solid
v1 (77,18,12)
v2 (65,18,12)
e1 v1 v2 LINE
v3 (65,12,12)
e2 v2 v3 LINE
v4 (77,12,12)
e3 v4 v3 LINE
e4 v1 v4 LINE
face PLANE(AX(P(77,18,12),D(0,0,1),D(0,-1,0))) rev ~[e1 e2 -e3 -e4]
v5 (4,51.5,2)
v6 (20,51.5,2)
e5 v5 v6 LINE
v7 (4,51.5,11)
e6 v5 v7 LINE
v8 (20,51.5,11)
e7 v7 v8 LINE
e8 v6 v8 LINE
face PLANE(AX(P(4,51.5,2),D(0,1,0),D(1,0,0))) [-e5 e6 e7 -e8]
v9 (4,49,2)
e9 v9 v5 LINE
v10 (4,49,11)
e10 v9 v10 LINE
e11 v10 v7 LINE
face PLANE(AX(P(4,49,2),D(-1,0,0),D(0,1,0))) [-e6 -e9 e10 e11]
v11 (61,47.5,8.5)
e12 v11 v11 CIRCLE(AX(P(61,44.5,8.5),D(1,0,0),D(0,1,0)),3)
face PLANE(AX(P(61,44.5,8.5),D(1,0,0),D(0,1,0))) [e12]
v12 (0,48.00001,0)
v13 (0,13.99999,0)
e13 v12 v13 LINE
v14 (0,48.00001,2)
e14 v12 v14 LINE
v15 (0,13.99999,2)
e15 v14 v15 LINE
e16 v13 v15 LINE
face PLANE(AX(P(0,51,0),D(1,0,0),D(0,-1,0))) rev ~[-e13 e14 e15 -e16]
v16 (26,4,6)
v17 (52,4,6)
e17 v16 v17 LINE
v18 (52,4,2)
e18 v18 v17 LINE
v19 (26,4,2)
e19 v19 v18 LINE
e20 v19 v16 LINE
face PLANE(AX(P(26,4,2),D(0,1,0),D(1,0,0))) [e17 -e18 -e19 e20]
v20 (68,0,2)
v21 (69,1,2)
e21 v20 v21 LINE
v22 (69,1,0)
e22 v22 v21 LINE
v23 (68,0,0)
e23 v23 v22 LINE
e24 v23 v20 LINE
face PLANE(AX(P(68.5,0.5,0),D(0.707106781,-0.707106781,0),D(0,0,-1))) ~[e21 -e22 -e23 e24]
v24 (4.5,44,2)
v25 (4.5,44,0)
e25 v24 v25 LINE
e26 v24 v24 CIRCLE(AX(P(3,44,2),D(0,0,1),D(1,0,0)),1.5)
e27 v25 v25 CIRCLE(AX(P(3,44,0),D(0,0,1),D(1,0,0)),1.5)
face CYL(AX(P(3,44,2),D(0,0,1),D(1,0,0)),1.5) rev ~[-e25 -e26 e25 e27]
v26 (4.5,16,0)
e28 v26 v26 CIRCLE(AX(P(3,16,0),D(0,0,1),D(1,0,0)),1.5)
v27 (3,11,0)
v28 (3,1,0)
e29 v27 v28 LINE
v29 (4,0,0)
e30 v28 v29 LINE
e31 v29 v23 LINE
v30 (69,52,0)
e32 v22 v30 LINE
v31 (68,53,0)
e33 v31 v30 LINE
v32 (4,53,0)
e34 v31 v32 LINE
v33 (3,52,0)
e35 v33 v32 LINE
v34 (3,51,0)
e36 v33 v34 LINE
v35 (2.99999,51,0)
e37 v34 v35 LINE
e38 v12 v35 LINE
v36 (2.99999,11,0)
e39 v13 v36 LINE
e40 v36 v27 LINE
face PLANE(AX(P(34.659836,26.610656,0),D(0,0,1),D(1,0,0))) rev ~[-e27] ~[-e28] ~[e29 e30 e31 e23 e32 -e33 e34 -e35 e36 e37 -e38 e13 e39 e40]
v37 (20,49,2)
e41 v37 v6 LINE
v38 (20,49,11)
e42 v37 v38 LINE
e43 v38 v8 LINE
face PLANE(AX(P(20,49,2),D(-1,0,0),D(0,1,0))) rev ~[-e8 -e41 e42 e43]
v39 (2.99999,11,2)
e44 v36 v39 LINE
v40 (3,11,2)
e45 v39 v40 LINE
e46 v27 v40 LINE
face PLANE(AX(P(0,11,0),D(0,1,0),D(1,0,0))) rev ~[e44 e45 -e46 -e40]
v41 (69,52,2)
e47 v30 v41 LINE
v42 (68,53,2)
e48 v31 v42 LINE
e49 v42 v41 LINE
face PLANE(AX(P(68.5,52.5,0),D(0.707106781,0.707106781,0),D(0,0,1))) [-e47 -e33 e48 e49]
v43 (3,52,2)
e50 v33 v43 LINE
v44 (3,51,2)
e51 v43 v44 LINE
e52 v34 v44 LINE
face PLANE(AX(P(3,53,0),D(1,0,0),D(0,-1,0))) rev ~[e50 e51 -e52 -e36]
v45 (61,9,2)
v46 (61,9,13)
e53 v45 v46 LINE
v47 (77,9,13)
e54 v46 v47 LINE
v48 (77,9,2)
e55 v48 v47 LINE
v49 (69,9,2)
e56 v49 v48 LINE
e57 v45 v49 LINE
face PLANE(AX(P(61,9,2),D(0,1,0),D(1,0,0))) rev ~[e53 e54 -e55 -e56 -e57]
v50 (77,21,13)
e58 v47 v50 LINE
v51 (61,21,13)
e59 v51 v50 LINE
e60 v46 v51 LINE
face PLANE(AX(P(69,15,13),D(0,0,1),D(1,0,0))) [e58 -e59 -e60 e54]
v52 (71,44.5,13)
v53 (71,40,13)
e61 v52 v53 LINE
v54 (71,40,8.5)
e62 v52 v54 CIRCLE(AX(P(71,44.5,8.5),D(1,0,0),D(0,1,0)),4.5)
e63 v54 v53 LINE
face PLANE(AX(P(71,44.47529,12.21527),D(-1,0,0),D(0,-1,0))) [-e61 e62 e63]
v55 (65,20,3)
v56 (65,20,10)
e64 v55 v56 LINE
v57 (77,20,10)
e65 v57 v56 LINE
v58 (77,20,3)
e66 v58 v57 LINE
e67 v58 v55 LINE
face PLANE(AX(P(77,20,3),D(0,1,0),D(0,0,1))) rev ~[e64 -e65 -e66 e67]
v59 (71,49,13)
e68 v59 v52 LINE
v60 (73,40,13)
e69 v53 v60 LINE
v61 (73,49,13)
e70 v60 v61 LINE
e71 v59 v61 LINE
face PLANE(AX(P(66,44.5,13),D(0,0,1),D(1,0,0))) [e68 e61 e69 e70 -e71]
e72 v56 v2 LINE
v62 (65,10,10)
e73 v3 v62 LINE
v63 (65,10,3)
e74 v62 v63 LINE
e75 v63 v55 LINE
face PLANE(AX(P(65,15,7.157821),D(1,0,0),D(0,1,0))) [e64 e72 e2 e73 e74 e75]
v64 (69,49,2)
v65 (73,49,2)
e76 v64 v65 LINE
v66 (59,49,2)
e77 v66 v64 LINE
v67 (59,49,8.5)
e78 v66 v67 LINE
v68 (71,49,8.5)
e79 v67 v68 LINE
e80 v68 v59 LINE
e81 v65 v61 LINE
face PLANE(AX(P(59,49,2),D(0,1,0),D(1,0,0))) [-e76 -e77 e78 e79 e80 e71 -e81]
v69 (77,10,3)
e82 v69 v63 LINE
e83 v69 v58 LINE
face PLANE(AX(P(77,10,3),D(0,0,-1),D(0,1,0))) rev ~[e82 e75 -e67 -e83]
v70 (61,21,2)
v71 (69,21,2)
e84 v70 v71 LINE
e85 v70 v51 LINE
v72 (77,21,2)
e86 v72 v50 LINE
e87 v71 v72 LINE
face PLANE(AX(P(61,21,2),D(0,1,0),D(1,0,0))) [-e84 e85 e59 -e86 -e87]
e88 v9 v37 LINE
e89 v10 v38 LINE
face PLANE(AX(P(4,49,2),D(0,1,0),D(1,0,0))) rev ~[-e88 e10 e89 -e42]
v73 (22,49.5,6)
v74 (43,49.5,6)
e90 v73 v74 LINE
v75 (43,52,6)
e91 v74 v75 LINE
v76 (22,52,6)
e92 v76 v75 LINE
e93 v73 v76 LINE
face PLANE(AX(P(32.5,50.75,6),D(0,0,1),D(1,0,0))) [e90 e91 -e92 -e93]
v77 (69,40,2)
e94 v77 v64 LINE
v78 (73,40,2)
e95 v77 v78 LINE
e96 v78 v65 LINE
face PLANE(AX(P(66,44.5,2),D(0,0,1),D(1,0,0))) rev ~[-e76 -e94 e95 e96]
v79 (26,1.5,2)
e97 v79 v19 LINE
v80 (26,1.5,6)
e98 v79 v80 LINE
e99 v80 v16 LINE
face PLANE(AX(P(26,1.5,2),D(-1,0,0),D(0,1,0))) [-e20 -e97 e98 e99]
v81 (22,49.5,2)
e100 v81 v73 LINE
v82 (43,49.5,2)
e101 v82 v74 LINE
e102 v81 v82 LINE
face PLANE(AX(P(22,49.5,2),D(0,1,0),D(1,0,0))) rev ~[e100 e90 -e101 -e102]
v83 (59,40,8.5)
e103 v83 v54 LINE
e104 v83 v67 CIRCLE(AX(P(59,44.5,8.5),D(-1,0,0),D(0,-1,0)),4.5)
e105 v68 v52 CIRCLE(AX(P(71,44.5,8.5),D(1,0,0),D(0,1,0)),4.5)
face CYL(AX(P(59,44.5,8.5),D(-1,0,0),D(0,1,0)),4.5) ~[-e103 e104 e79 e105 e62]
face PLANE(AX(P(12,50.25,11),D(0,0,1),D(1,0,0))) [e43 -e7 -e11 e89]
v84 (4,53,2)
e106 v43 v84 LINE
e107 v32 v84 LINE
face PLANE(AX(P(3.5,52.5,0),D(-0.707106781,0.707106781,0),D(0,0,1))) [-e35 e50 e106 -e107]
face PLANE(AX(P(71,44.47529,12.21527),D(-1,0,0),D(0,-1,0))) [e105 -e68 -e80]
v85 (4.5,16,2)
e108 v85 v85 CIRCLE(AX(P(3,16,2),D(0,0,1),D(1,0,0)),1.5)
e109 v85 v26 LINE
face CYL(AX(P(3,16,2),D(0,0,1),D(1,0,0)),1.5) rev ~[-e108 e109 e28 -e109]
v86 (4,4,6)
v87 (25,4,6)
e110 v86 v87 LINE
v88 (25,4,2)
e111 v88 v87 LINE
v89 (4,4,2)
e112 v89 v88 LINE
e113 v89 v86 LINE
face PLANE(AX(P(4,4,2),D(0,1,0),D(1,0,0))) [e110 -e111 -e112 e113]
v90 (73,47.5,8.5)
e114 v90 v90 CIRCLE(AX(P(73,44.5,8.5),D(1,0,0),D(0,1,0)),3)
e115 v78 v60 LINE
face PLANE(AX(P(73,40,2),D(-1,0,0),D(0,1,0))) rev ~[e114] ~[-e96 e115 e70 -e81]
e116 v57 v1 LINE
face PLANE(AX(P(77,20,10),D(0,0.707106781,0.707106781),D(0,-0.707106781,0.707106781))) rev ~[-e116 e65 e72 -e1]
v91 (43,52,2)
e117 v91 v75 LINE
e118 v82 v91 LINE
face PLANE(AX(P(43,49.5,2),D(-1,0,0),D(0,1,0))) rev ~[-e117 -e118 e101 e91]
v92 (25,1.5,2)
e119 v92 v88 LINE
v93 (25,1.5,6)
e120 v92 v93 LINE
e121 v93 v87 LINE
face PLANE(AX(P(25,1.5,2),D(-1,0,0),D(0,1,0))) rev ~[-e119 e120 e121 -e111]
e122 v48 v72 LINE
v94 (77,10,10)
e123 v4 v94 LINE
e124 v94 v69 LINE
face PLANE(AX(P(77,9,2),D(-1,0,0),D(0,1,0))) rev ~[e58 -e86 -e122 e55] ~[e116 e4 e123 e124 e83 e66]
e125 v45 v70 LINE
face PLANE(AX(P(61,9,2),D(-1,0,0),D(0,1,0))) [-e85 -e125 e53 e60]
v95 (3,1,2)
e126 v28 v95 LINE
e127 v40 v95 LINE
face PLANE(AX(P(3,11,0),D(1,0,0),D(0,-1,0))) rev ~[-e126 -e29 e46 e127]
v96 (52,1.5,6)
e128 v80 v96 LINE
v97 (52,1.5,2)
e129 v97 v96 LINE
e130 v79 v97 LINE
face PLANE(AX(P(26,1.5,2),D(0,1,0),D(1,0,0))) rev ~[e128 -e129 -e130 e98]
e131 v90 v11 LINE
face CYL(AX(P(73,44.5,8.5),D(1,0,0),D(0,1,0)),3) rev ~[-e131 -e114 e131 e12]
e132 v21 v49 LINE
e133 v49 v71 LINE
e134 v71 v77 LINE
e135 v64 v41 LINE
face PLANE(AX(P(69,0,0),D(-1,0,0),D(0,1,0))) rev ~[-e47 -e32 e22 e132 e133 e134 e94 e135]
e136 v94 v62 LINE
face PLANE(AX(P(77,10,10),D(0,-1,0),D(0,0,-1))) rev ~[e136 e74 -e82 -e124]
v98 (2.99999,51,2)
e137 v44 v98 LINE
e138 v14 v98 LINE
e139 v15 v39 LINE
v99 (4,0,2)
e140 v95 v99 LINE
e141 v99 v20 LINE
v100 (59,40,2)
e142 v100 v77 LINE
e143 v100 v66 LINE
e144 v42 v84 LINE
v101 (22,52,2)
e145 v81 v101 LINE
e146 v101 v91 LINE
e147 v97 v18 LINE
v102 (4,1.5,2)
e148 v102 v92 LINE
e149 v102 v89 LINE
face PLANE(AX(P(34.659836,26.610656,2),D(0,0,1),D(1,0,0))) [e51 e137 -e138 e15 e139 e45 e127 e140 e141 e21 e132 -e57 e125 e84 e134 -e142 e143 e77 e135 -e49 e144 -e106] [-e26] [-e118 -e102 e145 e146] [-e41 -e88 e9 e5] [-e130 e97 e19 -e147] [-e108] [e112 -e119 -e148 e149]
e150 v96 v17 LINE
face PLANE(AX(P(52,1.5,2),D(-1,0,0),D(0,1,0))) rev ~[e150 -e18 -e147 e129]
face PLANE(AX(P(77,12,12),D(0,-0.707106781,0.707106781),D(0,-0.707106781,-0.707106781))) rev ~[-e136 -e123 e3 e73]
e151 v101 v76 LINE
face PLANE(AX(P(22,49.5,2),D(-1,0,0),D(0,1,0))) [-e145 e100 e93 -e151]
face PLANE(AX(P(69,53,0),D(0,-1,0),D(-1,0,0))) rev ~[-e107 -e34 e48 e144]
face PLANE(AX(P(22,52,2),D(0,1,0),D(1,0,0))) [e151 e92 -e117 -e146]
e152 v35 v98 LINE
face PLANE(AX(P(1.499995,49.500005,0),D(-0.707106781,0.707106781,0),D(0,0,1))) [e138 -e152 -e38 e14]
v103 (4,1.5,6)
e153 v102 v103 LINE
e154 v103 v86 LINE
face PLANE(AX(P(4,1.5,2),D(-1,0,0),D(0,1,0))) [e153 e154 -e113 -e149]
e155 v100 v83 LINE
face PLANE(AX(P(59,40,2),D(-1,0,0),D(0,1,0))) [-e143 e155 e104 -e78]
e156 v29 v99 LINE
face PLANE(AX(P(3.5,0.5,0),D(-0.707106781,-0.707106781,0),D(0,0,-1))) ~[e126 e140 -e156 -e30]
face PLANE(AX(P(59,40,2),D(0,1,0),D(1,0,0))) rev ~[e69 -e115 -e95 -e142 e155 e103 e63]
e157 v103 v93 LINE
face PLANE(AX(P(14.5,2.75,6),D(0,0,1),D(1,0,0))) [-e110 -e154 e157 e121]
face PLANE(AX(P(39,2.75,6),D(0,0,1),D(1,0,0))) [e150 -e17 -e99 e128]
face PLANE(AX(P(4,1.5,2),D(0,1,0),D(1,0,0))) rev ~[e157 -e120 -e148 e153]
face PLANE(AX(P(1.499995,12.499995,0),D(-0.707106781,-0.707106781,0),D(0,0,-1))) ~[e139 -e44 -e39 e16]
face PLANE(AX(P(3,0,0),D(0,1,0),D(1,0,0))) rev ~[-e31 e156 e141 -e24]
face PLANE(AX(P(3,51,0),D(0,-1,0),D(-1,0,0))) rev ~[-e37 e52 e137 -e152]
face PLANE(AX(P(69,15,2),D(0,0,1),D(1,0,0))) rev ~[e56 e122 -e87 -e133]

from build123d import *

# Parameters (mm, degrees)
F1_DEPTH  = 2
F2_W      = 16
F2_H      = 12
F3_DEPTH  = 11
F4_W      = 14
F4_H      = 9
F5_DEPTH  = 11
F6_W      = 16
F6_H      = 2.5
F7_DEPTH  = 9
F8_W      = 21
F8_H      = 2.5
F9_DEPTH  = 4
F10_W     = 21
F10_H     = 2.5
F10_W_2   = 26
F11_DEPTH = 4
F13_DEPTH = 12
F14_R     = 3
F15_DEPTH = 12
F17_DEPTH = 12
F18_SIZE2 = 2.99999
F18_SIZE  = 2.99999
F19_SIZE2 = 1
F19_SIZE  = 1
F20_R     = 1.5
F21_DEPTH = 2


# Not quite as in the source:
# - a fillet or chamfer is up to 0.001 mm smaller than in the source, because OpenCascade refuses the exact size


with BuildPart() as f1:
    # F0 (on Top) → F1 (new body)
    with BuildSketch(Plane.XY):
        Polygon((3, 11), (3, 0), (69, 0), (69, 53), (3, 53), (3, 51), (0, 51), (0, 11), align=None)
    extrude(amount=F1_DEPTH)

    # F2 (on face) → F3 (join)
    with BuildSketch(Plane.XY.offset(2)):
        with Locations((69, 15)):
            Rectangle(F2_W, F2_H)
    extrude(amount=F3_DEPTH)

    # F4 (on face) → F5 (join)
    with BuildSketch(Plane.XY.offset(2)):
        with Locations((66, 44.5)):
            Rectangle(F4_W, F4_H)
    extrude(amount=F5_DEPTH)

    # F6 (on face) → F7 (join)
    with BuildSketch(Plane.XY.offset(2)):
        with Locations((12, 50.25)):
            Rectangle(F6_W, F6_H)
    extrude(amount=F7_DEPTH)

    # F8 (on face) → F9 (join)
    with BuildSketch(Plane.XY.offset(2)):
        with Locations((32.5, 50.75)):
            Rectangle(F8_W, F8_H)
    extrude(amount=F9_DEPTH)

    # F10 (on face) → F11 (join)
    with BuildSketch(Plane.XY.offset(2)):
        with Locations((14.5, 2.75)):
            Rectangle(F10_W, F10_H)
        with Locations((39, 2.75)):
            Rectangle(F10_W_2, F10_H)
    extrude(amount=F11_DEPTH)

    # F12 (on face) → F13 (cut)
    with BuildSketch(Plane(origin=(59, 0, 0), x_dir=(0, -1, 0), z_dir=(-1, 0, 0))):
        with BuildLine():
            ThreePointArc((-49, 8.5), (-44.5, 13), (-40, 8.5))
            Line((-40, 8.5), (-38.6329554021, 9.580289945))
            Line((-38.6329554021, 9.580289945), (-38.187738508, 14.0570942312))
            Line((-38.187738508, 14.0570942312), (-42.2688946128, 14.7991068661))
            Line((-42.2688946128, 14.7991068661), (-51.2474328279, 13.8839585707))
            Line((-51.2474328279, 13.8839585707), (-49, 8.5))
        make_face()
        Polygon((-40, 13), (-40, 8.5), (-38.6329554021, 9.580289945), (-38.187738508, 14.0570942312), (-42.2688946128, 14.7991068661), (-51.2474328279, 13.8839585707), (-49, 8.5), (-49, 13), (-44.5, 13), align=None)
    extrude(amount=-F13_DEPTH, mode=Mode.SUBTRACT)

    # F14 (on face) → F15 (cut)
    with BuildSketch(Plane.YZ.offset(73)):
        with Locations((44.5, 8.5)):
            Circle(F14_R)
    extrude(amount=-F15_DEPTH, mode=Mode.SUBTRACT)

    # F16 (on face) → F17 (cut)
    with BuildSketch(Plane.YZ.offset(77)):
        Polygon((18, 12), (12, 12), (10, 10), (10, 3), (20, 3), (20, 10), align=None)
    extrude(amount=-F17_DEPTH, mode=Mode.SUBTRACT)

    # F18 (size 3 and 3 in the source; OpenCascade refuses exactly that, so slightly less here)
    f18_edges = [f1.edges().sort_by_distance(p)[0] for p in [
        (0, 51, 1),
        (0, 11, 1),
    ]]
    chamfer(f18_edges, length=F18_SIZE, length2=F18_SIZE2)

    # F19
    f19_edges = [f1.edges().sort_by_distance(p)[0] for p in [
        (3, 0, 1),
        (69, 0, 1),
        (69, 53, 1),
        (3, 53, 1),
    ]]
    chamfer(f19_edges, length=F19_SIZE, length2=F19_SIZE2)

    # F20 (on face) → F21 (cut)
    with BuildSketch(Plane.XY.offset(2)):
        with Locations((3, 16)):
            Circle(F20_R)
        with Locations((3, 44)):
            Circle(F20_R)
    extrude(amount=-F21_DEPTH, mode=Mode.SUBTRACT)


solid = f1.part
